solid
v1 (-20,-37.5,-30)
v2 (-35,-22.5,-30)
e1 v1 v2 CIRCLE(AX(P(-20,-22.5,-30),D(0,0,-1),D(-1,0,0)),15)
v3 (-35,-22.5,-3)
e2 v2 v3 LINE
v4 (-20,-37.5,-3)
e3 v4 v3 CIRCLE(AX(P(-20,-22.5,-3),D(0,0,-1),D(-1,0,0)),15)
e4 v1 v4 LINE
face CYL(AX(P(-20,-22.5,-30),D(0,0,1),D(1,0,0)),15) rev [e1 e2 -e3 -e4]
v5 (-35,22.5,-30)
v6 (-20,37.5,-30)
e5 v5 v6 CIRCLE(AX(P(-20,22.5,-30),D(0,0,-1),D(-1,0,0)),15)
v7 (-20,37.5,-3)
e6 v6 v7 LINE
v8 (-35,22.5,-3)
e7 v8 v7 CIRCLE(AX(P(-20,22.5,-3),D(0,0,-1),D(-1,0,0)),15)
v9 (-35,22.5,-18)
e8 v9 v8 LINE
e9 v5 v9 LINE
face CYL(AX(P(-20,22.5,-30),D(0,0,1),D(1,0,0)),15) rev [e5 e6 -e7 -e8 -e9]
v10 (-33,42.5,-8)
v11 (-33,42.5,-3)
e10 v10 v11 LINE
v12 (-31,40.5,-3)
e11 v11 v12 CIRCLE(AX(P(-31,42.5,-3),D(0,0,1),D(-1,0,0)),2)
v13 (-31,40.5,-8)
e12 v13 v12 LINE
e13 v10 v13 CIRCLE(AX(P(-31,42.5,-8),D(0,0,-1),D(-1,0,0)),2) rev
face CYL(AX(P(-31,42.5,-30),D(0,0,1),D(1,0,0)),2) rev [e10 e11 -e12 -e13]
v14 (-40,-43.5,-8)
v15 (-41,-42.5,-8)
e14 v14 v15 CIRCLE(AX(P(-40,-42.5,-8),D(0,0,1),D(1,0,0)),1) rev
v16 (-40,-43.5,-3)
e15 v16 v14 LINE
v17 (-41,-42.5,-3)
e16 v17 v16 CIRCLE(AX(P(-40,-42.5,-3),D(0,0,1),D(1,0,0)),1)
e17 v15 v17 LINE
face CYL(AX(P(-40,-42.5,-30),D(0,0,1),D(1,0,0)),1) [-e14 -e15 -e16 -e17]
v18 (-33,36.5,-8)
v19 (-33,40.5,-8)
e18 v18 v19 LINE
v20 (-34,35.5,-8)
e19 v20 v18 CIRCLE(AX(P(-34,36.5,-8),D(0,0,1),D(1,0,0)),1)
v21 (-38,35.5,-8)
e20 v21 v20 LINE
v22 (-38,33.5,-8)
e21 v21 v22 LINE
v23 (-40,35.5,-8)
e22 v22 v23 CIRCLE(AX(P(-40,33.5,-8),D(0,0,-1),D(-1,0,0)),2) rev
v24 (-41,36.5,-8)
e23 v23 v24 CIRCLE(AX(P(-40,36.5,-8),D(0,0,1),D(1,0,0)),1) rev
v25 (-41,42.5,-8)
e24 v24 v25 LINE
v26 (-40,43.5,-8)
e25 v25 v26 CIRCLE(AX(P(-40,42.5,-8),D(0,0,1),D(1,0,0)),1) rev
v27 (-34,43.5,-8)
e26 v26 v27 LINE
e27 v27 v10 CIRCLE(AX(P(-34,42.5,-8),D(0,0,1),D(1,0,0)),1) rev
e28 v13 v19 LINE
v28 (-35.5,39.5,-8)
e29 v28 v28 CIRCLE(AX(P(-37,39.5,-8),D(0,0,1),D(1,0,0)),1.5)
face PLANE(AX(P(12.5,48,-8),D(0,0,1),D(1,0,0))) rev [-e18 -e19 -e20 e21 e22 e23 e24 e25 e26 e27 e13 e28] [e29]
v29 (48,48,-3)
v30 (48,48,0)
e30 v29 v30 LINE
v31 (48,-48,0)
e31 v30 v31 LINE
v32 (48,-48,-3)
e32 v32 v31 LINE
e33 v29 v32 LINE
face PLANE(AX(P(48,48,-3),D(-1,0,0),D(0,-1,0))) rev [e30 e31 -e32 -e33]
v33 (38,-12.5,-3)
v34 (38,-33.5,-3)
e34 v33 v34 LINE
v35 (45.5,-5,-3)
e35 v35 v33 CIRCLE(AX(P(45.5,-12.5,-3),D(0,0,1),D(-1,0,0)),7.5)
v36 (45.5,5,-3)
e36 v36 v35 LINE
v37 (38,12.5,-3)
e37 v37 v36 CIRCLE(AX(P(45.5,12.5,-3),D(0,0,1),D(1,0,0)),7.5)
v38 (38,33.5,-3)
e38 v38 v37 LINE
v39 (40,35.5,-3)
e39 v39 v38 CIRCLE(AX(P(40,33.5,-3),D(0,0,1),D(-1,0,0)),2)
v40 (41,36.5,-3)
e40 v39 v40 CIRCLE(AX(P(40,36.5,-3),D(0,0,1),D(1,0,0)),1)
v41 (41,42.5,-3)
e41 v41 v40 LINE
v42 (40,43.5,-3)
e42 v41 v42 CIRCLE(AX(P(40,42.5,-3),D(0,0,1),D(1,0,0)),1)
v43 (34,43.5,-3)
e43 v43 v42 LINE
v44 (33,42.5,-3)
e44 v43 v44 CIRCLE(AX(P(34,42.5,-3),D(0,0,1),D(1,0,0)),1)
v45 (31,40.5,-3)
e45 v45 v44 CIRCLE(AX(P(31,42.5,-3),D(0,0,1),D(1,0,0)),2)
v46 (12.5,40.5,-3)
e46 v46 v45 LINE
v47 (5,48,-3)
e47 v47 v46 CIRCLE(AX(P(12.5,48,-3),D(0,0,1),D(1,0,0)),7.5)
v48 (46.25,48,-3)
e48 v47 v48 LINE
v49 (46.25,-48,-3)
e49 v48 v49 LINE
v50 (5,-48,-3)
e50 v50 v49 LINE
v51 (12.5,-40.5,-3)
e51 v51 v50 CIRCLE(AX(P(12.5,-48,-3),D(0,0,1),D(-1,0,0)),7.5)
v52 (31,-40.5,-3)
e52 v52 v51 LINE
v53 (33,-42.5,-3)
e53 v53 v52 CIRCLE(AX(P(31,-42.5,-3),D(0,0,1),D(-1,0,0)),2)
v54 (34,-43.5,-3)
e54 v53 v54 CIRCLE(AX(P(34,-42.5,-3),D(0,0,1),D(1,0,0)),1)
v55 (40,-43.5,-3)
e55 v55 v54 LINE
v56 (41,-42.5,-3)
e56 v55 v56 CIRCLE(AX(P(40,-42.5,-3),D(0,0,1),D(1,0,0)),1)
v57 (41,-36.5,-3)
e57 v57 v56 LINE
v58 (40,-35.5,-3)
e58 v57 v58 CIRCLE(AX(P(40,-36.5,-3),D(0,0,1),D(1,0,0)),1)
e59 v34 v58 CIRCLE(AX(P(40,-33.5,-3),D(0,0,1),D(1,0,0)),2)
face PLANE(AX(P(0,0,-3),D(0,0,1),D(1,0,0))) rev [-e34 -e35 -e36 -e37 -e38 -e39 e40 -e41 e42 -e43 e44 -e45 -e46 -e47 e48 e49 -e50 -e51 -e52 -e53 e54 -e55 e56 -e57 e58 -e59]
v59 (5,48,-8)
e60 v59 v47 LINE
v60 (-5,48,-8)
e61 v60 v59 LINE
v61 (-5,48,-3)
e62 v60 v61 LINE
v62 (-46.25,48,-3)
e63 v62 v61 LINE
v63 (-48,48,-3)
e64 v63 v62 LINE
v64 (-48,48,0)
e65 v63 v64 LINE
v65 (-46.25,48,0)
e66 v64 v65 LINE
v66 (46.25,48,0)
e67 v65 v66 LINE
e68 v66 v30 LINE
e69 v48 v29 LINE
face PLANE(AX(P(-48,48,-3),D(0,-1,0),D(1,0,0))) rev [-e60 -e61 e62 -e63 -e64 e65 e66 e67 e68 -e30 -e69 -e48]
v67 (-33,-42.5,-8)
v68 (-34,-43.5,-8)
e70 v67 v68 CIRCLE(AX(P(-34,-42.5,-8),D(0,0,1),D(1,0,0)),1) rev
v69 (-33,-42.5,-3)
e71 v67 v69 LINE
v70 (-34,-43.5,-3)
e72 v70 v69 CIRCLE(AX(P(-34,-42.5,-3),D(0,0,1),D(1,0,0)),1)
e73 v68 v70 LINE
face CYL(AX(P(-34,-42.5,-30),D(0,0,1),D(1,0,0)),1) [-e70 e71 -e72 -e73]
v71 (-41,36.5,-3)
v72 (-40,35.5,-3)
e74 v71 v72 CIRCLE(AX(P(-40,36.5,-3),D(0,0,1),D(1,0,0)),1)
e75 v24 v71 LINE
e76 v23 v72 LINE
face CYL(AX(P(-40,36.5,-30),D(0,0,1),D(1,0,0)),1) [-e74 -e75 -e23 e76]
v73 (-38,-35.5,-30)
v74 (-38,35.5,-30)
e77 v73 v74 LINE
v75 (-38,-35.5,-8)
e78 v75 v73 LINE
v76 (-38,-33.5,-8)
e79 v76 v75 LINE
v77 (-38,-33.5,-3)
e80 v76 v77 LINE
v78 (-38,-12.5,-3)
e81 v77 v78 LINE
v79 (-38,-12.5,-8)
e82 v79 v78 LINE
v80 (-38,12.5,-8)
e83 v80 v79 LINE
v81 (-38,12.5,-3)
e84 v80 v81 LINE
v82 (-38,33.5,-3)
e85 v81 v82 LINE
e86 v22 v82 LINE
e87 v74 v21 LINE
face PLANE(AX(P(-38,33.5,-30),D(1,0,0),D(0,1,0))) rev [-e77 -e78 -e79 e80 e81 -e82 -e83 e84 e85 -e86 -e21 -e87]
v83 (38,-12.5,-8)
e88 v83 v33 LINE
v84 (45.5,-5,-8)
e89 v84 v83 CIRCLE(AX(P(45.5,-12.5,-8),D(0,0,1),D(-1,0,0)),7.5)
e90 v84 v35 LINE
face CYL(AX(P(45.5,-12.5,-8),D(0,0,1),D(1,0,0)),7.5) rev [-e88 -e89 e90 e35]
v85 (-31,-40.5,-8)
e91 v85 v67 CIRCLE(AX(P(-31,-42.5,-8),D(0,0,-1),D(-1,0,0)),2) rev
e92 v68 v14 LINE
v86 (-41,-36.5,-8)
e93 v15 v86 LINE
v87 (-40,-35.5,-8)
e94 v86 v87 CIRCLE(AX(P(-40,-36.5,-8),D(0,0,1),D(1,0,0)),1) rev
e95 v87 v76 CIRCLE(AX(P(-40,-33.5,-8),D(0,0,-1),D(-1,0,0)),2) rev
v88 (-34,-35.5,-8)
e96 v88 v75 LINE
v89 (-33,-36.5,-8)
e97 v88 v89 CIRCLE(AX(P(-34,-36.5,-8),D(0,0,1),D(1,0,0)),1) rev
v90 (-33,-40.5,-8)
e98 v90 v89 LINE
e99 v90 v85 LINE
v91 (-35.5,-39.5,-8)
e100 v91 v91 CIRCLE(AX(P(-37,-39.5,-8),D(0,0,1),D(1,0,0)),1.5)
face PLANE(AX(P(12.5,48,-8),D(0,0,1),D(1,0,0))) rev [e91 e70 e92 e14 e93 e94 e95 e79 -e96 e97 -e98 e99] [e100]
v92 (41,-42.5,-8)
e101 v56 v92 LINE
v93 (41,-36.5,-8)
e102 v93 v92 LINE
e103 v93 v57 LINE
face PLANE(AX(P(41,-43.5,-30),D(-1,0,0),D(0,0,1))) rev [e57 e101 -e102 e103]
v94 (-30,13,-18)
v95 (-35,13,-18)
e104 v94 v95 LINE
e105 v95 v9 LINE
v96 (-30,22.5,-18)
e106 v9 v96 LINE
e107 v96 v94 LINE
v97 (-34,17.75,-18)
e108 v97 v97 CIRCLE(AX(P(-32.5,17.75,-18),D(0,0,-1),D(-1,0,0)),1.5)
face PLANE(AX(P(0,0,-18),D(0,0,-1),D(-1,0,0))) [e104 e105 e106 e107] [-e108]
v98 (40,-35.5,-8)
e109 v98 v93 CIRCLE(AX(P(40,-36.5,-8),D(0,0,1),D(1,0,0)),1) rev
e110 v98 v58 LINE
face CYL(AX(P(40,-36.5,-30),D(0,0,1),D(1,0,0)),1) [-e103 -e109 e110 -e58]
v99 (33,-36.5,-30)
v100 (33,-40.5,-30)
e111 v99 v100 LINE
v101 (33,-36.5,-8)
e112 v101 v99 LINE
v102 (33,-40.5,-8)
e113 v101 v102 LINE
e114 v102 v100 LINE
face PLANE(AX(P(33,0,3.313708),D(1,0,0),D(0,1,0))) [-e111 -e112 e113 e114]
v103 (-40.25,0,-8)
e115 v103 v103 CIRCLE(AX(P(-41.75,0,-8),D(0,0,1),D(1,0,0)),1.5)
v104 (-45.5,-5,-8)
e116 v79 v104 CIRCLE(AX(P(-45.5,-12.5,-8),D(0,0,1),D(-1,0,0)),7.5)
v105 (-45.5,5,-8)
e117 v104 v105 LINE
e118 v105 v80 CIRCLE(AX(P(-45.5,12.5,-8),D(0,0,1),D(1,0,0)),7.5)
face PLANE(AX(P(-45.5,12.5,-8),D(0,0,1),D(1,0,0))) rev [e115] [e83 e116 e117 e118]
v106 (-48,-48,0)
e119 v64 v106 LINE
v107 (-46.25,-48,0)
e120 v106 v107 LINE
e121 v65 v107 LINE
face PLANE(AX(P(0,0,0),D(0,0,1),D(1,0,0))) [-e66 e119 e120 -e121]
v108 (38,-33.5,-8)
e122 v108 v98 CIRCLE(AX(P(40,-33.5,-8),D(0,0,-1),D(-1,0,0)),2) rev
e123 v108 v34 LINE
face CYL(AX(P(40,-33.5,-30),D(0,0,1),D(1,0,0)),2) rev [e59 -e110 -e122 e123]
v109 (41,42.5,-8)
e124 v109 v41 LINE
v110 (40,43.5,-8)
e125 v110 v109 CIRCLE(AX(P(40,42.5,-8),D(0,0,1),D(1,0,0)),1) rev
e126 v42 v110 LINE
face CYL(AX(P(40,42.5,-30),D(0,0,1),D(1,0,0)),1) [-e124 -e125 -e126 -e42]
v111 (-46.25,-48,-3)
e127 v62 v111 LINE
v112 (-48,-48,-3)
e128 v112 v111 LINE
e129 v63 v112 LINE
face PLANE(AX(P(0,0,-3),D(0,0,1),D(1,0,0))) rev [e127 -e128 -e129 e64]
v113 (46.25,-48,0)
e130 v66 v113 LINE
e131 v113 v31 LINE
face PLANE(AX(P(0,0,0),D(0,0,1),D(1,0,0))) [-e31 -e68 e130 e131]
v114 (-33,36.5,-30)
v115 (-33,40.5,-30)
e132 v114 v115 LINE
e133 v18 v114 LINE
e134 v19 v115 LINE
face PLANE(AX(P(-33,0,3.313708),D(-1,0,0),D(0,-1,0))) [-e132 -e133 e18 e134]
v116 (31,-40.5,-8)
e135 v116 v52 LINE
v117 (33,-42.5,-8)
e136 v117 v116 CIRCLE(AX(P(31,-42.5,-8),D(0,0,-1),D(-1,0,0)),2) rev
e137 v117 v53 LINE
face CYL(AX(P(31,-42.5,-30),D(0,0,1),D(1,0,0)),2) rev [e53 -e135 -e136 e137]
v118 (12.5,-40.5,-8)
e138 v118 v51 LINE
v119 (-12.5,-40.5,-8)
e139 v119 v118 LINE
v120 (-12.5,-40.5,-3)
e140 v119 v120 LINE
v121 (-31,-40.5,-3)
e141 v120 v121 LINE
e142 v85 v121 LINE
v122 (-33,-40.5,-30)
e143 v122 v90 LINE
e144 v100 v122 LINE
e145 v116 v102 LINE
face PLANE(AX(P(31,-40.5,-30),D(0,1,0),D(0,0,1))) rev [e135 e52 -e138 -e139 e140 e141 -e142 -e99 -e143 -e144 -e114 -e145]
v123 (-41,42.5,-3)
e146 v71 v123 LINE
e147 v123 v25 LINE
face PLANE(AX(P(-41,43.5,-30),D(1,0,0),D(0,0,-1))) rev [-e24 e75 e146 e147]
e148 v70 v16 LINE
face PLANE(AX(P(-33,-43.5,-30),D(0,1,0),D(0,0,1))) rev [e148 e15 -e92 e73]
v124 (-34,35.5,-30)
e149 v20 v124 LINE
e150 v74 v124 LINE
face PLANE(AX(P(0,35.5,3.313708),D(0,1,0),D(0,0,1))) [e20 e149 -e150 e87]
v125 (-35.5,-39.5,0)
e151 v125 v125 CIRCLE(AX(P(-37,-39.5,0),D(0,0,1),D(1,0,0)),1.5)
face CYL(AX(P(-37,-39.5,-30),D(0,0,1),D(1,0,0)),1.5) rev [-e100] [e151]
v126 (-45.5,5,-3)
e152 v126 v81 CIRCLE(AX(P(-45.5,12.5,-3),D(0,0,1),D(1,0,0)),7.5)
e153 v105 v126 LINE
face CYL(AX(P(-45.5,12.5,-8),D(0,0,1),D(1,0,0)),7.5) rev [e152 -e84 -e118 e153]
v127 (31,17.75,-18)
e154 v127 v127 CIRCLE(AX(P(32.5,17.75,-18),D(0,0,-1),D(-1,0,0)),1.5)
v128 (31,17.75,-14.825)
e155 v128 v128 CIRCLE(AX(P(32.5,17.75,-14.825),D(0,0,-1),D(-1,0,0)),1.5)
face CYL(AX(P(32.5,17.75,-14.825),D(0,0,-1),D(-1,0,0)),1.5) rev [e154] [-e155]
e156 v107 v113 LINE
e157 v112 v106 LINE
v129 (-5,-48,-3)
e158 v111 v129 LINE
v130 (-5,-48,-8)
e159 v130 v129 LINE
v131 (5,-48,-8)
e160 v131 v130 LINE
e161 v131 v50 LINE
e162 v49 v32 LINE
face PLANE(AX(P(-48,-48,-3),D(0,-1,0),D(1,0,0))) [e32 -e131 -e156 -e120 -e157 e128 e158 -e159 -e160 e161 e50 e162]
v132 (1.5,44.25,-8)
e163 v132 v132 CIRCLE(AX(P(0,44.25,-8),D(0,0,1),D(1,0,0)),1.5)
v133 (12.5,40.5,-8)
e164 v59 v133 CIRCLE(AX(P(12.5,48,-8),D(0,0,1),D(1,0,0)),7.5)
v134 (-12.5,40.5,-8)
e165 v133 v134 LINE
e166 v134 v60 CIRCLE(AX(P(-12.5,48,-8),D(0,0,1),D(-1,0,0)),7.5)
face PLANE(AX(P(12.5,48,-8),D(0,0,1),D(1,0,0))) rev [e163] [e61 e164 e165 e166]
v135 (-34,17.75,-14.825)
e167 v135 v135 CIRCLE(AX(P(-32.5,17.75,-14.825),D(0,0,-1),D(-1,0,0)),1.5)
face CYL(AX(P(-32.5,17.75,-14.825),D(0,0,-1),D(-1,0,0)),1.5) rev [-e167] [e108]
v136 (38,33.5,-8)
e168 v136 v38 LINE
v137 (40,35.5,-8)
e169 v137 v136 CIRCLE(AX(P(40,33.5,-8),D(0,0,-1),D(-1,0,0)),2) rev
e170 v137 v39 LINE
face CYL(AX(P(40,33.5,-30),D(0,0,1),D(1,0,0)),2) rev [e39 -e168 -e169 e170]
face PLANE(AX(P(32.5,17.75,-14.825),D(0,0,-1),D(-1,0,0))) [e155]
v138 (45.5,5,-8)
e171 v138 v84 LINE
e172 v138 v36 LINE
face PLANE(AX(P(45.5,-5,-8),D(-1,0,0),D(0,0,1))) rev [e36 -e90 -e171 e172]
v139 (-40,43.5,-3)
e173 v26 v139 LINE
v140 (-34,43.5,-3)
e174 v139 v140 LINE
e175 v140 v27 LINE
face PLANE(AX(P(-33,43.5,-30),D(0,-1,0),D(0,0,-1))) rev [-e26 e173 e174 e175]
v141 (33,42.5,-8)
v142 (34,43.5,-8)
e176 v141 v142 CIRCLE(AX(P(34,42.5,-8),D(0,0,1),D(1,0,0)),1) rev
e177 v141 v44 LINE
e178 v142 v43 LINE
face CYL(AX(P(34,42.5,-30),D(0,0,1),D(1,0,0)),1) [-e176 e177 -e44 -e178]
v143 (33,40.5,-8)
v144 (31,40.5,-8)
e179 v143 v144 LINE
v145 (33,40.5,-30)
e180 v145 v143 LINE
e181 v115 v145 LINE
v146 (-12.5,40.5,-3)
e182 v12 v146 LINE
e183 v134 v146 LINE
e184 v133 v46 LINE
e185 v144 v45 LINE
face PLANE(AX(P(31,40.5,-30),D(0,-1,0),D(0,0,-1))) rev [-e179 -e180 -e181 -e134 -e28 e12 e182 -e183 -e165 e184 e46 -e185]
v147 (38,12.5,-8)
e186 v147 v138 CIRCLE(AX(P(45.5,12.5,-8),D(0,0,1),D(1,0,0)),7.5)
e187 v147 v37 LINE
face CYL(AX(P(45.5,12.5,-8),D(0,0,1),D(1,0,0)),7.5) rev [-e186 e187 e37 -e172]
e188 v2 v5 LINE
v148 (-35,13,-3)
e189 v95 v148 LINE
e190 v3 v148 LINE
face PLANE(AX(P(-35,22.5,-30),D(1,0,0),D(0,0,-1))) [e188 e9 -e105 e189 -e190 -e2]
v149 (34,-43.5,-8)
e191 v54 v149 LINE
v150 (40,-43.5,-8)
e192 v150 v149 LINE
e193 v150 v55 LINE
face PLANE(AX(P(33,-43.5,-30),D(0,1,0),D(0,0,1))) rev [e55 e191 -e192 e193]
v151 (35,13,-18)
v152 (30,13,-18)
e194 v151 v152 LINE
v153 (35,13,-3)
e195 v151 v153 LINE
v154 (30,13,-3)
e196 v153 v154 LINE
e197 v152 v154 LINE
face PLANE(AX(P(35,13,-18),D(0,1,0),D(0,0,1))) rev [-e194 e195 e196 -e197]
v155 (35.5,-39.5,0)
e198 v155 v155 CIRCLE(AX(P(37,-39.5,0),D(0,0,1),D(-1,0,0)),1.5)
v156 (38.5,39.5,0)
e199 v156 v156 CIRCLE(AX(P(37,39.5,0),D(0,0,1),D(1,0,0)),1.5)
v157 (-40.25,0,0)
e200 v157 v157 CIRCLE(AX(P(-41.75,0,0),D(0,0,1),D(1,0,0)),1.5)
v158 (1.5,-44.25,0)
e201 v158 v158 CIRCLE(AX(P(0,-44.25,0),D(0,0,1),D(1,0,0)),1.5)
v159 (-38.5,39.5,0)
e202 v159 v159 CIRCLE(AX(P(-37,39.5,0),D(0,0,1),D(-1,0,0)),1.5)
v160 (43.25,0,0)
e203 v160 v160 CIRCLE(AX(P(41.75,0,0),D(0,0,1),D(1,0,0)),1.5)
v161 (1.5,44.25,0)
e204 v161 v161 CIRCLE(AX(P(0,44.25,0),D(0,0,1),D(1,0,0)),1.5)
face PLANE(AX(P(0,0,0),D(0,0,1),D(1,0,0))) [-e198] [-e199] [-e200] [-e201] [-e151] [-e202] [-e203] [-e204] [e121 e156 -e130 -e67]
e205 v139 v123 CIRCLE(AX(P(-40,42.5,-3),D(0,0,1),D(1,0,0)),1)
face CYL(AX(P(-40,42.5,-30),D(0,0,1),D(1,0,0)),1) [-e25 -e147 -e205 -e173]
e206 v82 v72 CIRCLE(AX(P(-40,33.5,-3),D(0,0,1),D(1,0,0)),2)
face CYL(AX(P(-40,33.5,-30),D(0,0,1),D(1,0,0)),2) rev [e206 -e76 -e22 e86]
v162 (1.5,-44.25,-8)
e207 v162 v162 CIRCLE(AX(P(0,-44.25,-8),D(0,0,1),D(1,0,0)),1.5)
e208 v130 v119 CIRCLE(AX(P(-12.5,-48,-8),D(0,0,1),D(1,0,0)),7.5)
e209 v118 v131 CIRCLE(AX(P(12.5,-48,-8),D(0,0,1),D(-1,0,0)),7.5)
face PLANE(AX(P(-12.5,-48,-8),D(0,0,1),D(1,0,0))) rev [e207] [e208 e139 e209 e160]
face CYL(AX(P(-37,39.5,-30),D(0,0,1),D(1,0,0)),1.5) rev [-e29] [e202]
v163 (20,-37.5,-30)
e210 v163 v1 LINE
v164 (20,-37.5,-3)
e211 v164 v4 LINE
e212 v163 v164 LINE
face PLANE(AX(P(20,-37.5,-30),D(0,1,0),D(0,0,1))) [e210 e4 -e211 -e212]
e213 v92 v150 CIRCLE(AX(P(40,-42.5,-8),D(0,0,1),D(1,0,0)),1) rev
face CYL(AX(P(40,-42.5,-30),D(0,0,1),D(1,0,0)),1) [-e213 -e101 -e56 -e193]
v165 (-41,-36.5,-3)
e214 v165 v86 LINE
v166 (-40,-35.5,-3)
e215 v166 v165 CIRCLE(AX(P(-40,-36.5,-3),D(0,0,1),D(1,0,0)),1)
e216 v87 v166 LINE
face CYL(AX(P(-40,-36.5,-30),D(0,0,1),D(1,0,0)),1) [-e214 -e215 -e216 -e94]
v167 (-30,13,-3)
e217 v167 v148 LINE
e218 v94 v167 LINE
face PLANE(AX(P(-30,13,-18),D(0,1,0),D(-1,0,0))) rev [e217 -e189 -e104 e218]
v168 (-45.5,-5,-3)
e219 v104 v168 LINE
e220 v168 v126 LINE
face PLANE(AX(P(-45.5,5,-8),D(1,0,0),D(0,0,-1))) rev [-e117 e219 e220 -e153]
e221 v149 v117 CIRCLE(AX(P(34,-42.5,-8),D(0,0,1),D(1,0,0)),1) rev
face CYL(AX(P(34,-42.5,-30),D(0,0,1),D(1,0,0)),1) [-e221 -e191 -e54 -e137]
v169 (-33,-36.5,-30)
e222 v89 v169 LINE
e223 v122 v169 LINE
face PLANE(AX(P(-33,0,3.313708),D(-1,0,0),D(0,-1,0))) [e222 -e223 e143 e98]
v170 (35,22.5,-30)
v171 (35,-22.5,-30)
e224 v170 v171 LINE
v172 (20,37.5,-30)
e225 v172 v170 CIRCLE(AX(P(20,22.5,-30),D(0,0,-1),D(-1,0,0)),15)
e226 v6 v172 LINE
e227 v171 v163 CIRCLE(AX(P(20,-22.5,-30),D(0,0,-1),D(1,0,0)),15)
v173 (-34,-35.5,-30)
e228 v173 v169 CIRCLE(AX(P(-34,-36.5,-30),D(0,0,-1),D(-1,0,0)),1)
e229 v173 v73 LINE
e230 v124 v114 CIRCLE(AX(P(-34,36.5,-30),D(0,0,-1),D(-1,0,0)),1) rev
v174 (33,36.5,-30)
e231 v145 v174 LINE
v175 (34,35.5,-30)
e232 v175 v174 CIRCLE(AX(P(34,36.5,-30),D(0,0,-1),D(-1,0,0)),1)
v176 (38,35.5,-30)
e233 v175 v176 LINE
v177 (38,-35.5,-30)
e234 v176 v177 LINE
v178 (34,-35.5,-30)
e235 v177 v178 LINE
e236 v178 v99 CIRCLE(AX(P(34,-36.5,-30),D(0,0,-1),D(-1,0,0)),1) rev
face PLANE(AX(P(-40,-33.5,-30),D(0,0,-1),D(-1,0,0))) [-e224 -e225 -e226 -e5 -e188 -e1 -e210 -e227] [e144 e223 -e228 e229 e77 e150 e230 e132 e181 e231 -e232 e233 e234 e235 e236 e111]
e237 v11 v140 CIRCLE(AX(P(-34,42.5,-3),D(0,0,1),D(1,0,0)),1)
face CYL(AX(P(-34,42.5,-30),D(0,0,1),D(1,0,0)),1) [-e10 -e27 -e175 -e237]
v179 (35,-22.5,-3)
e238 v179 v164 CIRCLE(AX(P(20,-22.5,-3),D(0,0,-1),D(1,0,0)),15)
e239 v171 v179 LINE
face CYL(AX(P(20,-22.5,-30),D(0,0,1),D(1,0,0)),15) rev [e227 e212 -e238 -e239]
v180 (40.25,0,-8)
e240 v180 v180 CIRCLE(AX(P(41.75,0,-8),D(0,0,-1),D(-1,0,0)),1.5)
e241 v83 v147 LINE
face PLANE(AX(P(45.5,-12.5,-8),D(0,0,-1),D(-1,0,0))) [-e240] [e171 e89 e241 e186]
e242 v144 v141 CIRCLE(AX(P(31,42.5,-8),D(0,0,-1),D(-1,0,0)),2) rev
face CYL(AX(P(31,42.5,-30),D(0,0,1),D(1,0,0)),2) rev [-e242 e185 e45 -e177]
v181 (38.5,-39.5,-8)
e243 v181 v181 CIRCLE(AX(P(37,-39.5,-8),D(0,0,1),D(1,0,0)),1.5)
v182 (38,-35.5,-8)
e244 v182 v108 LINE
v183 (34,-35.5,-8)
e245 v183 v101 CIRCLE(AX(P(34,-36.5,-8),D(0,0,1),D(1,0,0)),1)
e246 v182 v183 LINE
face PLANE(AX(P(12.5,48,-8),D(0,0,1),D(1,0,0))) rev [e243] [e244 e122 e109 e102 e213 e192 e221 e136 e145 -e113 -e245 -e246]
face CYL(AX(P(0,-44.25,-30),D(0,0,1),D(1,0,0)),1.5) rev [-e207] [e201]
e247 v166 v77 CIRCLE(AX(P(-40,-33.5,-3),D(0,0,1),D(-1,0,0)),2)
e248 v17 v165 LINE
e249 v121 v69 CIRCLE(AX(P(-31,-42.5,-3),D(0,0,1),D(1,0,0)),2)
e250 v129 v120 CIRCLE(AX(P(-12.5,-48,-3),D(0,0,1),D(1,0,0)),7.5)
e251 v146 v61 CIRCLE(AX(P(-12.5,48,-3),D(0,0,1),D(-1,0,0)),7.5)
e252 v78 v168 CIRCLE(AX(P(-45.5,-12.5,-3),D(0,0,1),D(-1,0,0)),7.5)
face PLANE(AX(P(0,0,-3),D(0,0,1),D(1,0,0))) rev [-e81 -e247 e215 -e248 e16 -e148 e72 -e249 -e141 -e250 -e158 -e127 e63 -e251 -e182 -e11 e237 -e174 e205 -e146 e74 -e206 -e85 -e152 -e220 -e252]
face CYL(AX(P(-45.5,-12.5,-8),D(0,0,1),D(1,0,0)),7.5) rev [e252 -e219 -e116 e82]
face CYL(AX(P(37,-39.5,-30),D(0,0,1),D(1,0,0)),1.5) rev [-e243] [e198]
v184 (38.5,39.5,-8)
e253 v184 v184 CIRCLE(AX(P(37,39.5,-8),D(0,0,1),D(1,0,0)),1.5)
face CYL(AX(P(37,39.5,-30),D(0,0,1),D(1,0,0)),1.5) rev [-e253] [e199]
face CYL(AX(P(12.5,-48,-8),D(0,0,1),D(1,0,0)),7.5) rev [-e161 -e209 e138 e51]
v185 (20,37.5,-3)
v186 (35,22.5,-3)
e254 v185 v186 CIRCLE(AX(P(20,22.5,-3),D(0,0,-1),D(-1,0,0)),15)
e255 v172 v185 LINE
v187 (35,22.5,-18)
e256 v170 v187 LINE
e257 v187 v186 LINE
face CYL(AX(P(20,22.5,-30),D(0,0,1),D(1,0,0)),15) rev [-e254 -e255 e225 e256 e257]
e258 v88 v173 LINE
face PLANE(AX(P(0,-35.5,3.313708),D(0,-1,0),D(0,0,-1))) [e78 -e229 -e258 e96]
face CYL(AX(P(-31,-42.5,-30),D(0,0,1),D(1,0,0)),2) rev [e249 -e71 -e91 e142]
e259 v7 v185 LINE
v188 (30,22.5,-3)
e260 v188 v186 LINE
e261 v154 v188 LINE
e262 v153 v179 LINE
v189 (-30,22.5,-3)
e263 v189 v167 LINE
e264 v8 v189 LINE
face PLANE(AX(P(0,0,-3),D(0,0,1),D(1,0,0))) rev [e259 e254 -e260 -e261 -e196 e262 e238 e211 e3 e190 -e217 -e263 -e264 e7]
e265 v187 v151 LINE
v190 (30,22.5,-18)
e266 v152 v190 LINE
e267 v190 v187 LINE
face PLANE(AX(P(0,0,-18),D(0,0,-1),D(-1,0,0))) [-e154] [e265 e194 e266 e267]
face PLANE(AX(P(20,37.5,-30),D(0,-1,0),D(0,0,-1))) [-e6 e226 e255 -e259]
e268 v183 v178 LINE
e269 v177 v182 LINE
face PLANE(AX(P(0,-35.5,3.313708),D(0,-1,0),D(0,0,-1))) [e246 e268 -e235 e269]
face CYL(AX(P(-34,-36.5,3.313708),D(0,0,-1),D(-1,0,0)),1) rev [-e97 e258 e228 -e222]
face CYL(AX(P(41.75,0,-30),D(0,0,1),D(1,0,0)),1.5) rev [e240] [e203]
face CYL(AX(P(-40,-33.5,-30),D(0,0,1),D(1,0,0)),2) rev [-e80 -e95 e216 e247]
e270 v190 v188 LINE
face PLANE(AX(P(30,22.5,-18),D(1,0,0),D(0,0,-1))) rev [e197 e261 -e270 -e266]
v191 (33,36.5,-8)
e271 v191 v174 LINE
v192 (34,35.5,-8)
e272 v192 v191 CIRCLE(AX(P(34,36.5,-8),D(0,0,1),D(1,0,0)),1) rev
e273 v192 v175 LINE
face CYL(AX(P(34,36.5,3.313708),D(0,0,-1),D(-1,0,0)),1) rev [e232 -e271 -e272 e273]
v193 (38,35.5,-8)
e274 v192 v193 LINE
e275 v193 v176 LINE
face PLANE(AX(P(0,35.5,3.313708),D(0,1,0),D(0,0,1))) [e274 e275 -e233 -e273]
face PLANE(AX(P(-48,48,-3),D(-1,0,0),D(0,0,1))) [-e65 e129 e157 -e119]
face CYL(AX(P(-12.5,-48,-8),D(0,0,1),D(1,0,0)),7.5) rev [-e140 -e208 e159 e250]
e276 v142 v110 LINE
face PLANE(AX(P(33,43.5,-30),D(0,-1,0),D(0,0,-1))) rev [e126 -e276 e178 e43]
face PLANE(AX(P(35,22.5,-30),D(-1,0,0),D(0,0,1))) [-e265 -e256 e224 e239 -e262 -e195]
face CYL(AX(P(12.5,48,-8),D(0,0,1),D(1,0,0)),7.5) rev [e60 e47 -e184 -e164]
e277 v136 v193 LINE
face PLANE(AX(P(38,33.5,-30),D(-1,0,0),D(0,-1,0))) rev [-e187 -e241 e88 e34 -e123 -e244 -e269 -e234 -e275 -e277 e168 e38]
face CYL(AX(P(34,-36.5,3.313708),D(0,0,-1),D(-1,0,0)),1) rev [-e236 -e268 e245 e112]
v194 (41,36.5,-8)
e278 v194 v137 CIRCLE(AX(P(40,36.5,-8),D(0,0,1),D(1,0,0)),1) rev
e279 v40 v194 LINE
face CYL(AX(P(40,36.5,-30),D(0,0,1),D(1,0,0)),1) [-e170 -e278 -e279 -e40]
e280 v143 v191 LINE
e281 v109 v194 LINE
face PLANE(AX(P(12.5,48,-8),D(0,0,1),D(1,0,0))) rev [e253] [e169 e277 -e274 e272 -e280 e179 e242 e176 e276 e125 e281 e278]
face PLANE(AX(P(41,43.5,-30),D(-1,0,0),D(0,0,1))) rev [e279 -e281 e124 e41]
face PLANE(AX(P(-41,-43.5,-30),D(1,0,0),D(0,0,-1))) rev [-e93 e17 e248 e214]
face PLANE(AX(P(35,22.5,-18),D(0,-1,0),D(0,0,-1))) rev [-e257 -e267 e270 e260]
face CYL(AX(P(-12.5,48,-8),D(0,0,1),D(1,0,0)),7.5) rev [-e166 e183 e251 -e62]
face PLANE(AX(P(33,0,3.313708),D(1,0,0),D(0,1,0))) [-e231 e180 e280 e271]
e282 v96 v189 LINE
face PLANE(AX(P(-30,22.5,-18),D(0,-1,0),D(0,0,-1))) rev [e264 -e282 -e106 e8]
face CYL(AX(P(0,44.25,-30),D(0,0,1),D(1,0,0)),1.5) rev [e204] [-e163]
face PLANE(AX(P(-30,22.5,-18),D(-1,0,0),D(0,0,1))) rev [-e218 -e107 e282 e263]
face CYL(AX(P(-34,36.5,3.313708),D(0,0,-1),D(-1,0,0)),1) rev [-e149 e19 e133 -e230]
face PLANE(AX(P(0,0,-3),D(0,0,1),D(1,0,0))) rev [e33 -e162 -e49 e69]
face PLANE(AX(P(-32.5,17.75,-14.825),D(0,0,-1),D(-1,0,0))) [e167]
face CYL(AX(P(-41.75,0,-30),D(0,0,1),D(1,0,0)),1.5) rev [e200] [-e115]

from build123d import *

# Parameters (mm, degrees)
SKETCH2_W           = 96
SKETCH2_H           = 96
BOSS_EXTRUDE1_DEPTH = 3
BOSS_EXTRUDE2_DEPTH = 27
BOSS_EXTRUDE6_DEPTH = 5
SKETCH18_R          = 1.5
CUT_EXTRUDE3_DEPTH  = 75.215901261
SKETCH16_W          = 5
SKETCH16_H          = 9.5
BOSS_EXTRUDE7_DEPTH = 15
SKETCH17_R          = 1.5
CUT_EXTRUDE2_DEPTH  = 3.175
FILLET2_R           = 1
SKETCH22_R          = 1.5
CUT_EXTRUDE5_DEPTH  = 75.215901261
CUT_EXTRUDE6_START  = -22
SKETCH23_R          = 1.5
CUT_EXTRUDE6_DEPTH  = 22
SKETCH24_W          = 82
SKETCH24_H          = 87
SKETCH24_W_2        = 76
SKETCH24_H_2        = 81
CUT_EXTRUDE8_DEPTH  = 22


with BuildPart() as part:
    # Sketch2 → Boss-Extrude1 (new body)
    with BuildSketch(Plane.XY):
        Rectangle(SKETCH2_W, SKETCH2_H)
    extrude(amount=-BOSS_EXTRUDE1_DEPTH)

    # Sketch3 → Boss-Extrude2 (add)
    with BuildSketch(Plane(origin=(0, 0, -3), x_dir=(-1, 0, 0), z_dir=(0, 0, -1))):
        with BuildLine():
            ThreePointArc((-33, -42.5), (-32.414213562, -41.085786438), (-31, -40.5))
            Line((-31, -40.5), (31, -40.5))
            ThreePointArc((31, -40.5), (32.414213562, -41.085786438), (33, -42.5))
            Line((33, -42.5), (33, -43.5))
            Line((33, -43.5), (41, -43.5))
            Line((41, -43.5), (41, -35.5))
            Line((41, -35.5), (40, -35.5))
            ThreePointArc((40, -35.5), (38.585786438, -34.914213562), (38, -33.5))
            Line((38, -33.5), (38, 33.5))
            ThreePointArc((38, 33.5), (38.585786438, 34.914213562), (40, 35.5))
            Line((40, 35.5), (41, 35.5))
            Line((41, 35.5), (41, 43.5))
            Line((41, 43.5), (33, 43.5))
            Line((33, 43.5), (33, 42.5))
            ThreePointArc((33, 42.5), (32.414213562, 41.085786438), (31, 40.5))
            Line((31, 40.5), (-31, 40.5))
            ThreePointArc((-31, 40.5), (-32.414213562, 41.085786438), (-33, 42.5))
            Line((-33, 42.5), (-33, 43.5))
            Line((-33, 43.5), (-41, 43.5))
            Line((-41, 43.5), (-41, 35.5))
            Line((-41, 35.5), (-40, 35.5))
            ThreePointArc((-40, 35.5), (-38.585786438, 34.914213562), (-38, 33.5))
            Line((-38, 33.5), (-38, -33.5))
            ThreePointArc((-38, -33.5), (-38.585786438, -34.914213562), (-40, -35.5))
            Line((-40, -35.5), (-41, -35.5))
            Line((-41, -35.5), (-41, -43.5))
            Line((-41, -43.5), (-33, -43.5))
            Line((-33, -43.5), (-33, -42.5))
        make_face()
        with BuildLine():
            Line((-35, -22.5), (-35, 22.5))
            ThreePointArc((-35, 22.5), (-30.606601718, 33.106601718), (-20, 37.5))
            Line((-20, 37.5), (20, 37.5))
            ThreePointArc((20, 37.5), (30.606601718, 33.106601718), (35, 22.5))
            Line((35, 22.5), (35, -22.5))
            ThreePointArc((35, -22.5), (30.606601718, -33.106601718), (20, -37.5))
            Line((20, -37.5), (-20, -37.5))
            ThreePointArc((-20, -37.5), (-30.606601718, -33.106601718), (-35, -22.5))
        make_face(mode=Mode.SUBTRACT)
    extrude(amount=BOSS_EXTRUDE2_DEPTH)

    # Sketch15 → Boss-Extrude6 (add)
    with BuildSketch(Plane(origin=(0, 0, -3), x_dir=(-1, 0, 0), z_dir=(0, 0, -1))):
        with BuildLine():
            Line((-5, 48), (5, 48))
            ThreePointArc((5, 48), (7.196699141, 42.696699141), (12.5, 40.5))
            Line((12.5, 40.5), (-12.5, 40.5))
            ThreePointArc((-12.5, 40.5), (-7.196699141, 42.696699141), (-5, 48))
        make_face()
        with BuildLine():
            Line((45.5, 5), (45.5, -5))
            ThreePointArc((45.5, -5), (40.196699141, -7.196699141), (38, -12.5))
            Line((38, -12.5), (38, 12.5))
            ThreePointArc((38, 12.5), (40.196699141, 7.196699141), (45.5, 5))
        make_face()
        with BuildLine():
            Line((5, -48), (-5, -48))
            ThreePointArc((-5, -48), (-7.196699141, -42.696699141), (-12.5, -40.5))
            Line((-12.5, -40.5), (12.5, -40.5))
            ThreePointArc((12.5, -40.5), (7.196699141, -42.696699141), (5, -48))
        make_face()
        with BuildLine():
            Line((-45.5, -5), (-45.5, 5))
            ThreePointArc((-45.5, 5), (-40.196699141, 7.196699141), (-38, 12.5))
            Line((-38, 12.5), (-38, -12.5))
            ThreePointArc((-38, -12.5), (-40.196699141, -7.196699141), (-45.5, -5))
        make_face()
    extrude(amount=BOSS_EXTRUDE6_DEPTH)

    # Sketch18 → Cut-Extrude3 (cut, through all)
    with BuildSketch(Plane.XY):
        with Locations((0, 44.25)):
            Circle(SKETCH18_R)
        with Locations((0, -44.25)):
            Circle(SKETCH18_R)
        with Locations((41.75, 0)):
            Circle(SKETCH18_R)
        with Locations((-41.75, 0)):
            Circle(SKETCH18_R)
    extrude(amount=-CUT_EXTRUDE3_DEPTH, mode=Mode.SUBTRACT)

    # Sketch16 → Boss-Extrude7 (add)
    with BuildSketch(Plane(origin=(0, 0, -3), x_dir=(-1, 0, 0), z_dir=(0, 0, -1))):
        with Locations((-32.5, 17.75)):
            Rectangle(SKETCH16_W, SKETCH16_H)
        with Locations((32.5, 17.75)):
            Rectangle(SKETCH16_W, SKETCH16_H)
    extrude(amount=BOSS_EXTRUDE7_DEPTH)

    # Sketch17 → Cut-Extrude2 (cut)
    with BuildSketch(Plane(origin=(0, 0, -18), x_dir=(-1, 0, 0), z_dir=(0, 0, -1))):
        with Locations((-32.5, 17.75)):
            Circle(SKETCH17_R)
        with Locations((32.5, 17.75)):
            Circle(SKETCH17_R)
    extrude(amount=-CUT_EXTRUDE2_DEPTH, mode=Mode.SUBTRACT)

    # Fillet2
    fillet2_edges = [part.edges().sort_by_distance(p)[0] for p in [
        (-33, 43.5, -16.5),
        (-41, 35.5, -16.5),
        (-41, 43.5, -16.5),
        (33, 43.5, -16.5),
        (41, 43.5, -16.5),
        (41, 35.5, -16.5),
        (41, -35.5, -16.5),
        (33, -43.5, -16.5),
        (-33, -43.5, -16.5),
        (-41, -35.5, -16.5),
        (-41, -43.5, -16.5),
        (41, -43.5, -16.5),
    ]]
    fillet(fillet2_edges, radius=FILLET2_R - 0.0001)  # a hair under: the kernel refuses the full size

    # Sketch22 → Cut-Extrude5 (cut, through all)
    with BuildSketch(Plane.XY):
        with Locations((37, 39.5)):
            Circle(SKETCH22_R)
        with Locations(Location((-37, 39.5, 0), (0, 0, 180))):
            Circle(SKETCH22_R)
        with Locations(Location((37, -39.5, 0), (0, 0, 180))):
            Circle(SKETCH22_R)
        with Locations((-37, -39.5)):
            Circle(SKETCH22_R)
    extrude(amount=-CUT_EXTRUDE5_DEPTH, mode=Mode.SUBTRACT)

    # Sketch23 → Cut-Extrude6 (cut)
    # profile 1 of 4: a face of its own
    with BuildSketch(Plane(origin=(0, 0, -30), x_dir=(-1, 0, 0), z_dir=(0, 0, -1)).offset(CUT_EXTRUDE6_START)):
        with BuildLine():
            ThreePointArc((34, 35.5), (33.292893219, 35.792893219), (33, 36.5))
            Line((33, 36.5), (33, 42.5))
            ThreePointArc((33, 42.5), (33.292893219, 43.207106781), (34, 43.5))
            Line((34, 43.5), (40, 43.5))
            ThreePointArc((40, 43.5), (40.707106781, 43.207106781), (41, 42.5))
            Line((41, 42.5), (41, 36.5))
            ThreePointArc((41, 36.5), (40.707106781, 35.792893219), (40, 35.5))
            Line((40, 35.5), (34, 35.5))
        make_face()
        with Locations(Location((37, 39.5, 0), (0, 0, 180))):
            Circle(SKETCH23_R, mode=Mode.SUBTRACT)
    # profile 2 of 4: a face of its own
    with BuildSketch(Plane(origin=(0, 0, -30), x_dir=(-1, 0, 0), z_dir=(0, 0, -1)).offset(CUT_EXTRUDE6_START)):
        with BuildLine():
            Line((-34, 35.5), (-40, 35.5))
            ThreePointArc((-40, 35.5), (-40.707106781, 35.792893219), (-41, 36.5))
            Line((-41, 36.5), (-41, 42.5))
            ThreePointArc((-41, 42.5), (-40.707106781, 43.207106781), (-40, 43.5))
            Line((-40, 43.5), (-34, 43.5))
            ThreePointArc((-34, 43.5), (-33.292893219, 43.207106781), (-33, 42.5))
            Line((-33, 42.5), (-33, 36.5))
            ThreePointArc((-33, 36.5), (-33.292893219, 35.792893219), (-34, 35.5))
        make_face()
        with Locations(Location((-37, 39.5, 0), (0, 0, 180))):
            Circle(SKETCH23_R, mode=Mode.SUBTRACT)
    # profile 3 of 4: a face of its own
    with BuildSketch(Plane(origin=(0, 0, -30), x_dir=(-1, 0, 0), z_dir=(0, 0, -1)).offset(CUT_EXTRUDE6_START)):
        with BuildLine():
            ThreePointArc((-34, -35.5), (-33.292893219, -35.792893219), (-33, -36.5))
            Line((-33, -36.5), (-33, -42.5))
            ThreePointArc((-33, -42.5), (-33.292893219, -43.207106781), (-34, -43.5))
            Line((-34, -43.5), (-40, -43.5))
            ThreePointArc((-40, -43.5), (-40.707106781, -43.207106781), (-41, -42.5))
            Line((-41, -42.5), (-41, -36.5))
            ThreePointArc((-41, -36.5), (-40.707106781, -35.792893219), (-40, -35.5))
            Line((-40, -35.5), (-34, -35.5))
        make_face()
        with Locations(Location((-37, -39.5, 0), (0, 0, 180))):
            Circle(SKETCH23_R, mode=Mode.SUBTRACT)
    # profile 4 of 4: a face of its own
    with BuildSketch(Plane(origin=(0, 0, -30), x_dir=(-1, 0, 0), z_dir=(0, 0, -1)).offset(CUT_EXTRUDE6_START)):
        with BuildLine():
            Line((34, -35.5), (40, -35.5))
            ThreePointArc((40, -35.5), (40.707106781, -35.792893219), (41, -36.5))
            Line((41, -36.5), (41, -42.5))
            ThreePointArc((41, -42.5), (40.707106781, -43.207106781), (40, -43.5))
            Line((40, -43.5), (34, -43.5))
            ThreePointArc((34, -43.5), (33.292893219, -43.207106781), (33, -42.5))
            Line((33, -42.5), (33, -36.5))
            ThreePointArc((33, -36.5), (33.292893219, -35.792893219), (34, -35.5))
        make_face()
        with Locations(Location((37, -39.5, 0), (0, 0, 180))):
            Circle(SKETCH23_R, mode=Mode.SUBTRACT)
    extrude(amount=CUT_EXTRUDE6_DEPTH, mode=Mode.SUBTRACT)

    # Sketch24 → Cut-Extrude8 (cut)
    with BuildSketch(Plane(origin=(0, 0, -30), x_dir=(-1, 0, 0), z_dir=(0, 0, -1))):
        Rectangle(SKETCH24_W, SKETCH24_H)
        Rectangle(SKETCH24_W_2, SKETCH24_H_2, mode=Mode.SUBTRACT)
    extrude(amount=-CUT_EXTRUDE8_DEPTH, mode=Mode.SUBTRACT)


solid = part.part
